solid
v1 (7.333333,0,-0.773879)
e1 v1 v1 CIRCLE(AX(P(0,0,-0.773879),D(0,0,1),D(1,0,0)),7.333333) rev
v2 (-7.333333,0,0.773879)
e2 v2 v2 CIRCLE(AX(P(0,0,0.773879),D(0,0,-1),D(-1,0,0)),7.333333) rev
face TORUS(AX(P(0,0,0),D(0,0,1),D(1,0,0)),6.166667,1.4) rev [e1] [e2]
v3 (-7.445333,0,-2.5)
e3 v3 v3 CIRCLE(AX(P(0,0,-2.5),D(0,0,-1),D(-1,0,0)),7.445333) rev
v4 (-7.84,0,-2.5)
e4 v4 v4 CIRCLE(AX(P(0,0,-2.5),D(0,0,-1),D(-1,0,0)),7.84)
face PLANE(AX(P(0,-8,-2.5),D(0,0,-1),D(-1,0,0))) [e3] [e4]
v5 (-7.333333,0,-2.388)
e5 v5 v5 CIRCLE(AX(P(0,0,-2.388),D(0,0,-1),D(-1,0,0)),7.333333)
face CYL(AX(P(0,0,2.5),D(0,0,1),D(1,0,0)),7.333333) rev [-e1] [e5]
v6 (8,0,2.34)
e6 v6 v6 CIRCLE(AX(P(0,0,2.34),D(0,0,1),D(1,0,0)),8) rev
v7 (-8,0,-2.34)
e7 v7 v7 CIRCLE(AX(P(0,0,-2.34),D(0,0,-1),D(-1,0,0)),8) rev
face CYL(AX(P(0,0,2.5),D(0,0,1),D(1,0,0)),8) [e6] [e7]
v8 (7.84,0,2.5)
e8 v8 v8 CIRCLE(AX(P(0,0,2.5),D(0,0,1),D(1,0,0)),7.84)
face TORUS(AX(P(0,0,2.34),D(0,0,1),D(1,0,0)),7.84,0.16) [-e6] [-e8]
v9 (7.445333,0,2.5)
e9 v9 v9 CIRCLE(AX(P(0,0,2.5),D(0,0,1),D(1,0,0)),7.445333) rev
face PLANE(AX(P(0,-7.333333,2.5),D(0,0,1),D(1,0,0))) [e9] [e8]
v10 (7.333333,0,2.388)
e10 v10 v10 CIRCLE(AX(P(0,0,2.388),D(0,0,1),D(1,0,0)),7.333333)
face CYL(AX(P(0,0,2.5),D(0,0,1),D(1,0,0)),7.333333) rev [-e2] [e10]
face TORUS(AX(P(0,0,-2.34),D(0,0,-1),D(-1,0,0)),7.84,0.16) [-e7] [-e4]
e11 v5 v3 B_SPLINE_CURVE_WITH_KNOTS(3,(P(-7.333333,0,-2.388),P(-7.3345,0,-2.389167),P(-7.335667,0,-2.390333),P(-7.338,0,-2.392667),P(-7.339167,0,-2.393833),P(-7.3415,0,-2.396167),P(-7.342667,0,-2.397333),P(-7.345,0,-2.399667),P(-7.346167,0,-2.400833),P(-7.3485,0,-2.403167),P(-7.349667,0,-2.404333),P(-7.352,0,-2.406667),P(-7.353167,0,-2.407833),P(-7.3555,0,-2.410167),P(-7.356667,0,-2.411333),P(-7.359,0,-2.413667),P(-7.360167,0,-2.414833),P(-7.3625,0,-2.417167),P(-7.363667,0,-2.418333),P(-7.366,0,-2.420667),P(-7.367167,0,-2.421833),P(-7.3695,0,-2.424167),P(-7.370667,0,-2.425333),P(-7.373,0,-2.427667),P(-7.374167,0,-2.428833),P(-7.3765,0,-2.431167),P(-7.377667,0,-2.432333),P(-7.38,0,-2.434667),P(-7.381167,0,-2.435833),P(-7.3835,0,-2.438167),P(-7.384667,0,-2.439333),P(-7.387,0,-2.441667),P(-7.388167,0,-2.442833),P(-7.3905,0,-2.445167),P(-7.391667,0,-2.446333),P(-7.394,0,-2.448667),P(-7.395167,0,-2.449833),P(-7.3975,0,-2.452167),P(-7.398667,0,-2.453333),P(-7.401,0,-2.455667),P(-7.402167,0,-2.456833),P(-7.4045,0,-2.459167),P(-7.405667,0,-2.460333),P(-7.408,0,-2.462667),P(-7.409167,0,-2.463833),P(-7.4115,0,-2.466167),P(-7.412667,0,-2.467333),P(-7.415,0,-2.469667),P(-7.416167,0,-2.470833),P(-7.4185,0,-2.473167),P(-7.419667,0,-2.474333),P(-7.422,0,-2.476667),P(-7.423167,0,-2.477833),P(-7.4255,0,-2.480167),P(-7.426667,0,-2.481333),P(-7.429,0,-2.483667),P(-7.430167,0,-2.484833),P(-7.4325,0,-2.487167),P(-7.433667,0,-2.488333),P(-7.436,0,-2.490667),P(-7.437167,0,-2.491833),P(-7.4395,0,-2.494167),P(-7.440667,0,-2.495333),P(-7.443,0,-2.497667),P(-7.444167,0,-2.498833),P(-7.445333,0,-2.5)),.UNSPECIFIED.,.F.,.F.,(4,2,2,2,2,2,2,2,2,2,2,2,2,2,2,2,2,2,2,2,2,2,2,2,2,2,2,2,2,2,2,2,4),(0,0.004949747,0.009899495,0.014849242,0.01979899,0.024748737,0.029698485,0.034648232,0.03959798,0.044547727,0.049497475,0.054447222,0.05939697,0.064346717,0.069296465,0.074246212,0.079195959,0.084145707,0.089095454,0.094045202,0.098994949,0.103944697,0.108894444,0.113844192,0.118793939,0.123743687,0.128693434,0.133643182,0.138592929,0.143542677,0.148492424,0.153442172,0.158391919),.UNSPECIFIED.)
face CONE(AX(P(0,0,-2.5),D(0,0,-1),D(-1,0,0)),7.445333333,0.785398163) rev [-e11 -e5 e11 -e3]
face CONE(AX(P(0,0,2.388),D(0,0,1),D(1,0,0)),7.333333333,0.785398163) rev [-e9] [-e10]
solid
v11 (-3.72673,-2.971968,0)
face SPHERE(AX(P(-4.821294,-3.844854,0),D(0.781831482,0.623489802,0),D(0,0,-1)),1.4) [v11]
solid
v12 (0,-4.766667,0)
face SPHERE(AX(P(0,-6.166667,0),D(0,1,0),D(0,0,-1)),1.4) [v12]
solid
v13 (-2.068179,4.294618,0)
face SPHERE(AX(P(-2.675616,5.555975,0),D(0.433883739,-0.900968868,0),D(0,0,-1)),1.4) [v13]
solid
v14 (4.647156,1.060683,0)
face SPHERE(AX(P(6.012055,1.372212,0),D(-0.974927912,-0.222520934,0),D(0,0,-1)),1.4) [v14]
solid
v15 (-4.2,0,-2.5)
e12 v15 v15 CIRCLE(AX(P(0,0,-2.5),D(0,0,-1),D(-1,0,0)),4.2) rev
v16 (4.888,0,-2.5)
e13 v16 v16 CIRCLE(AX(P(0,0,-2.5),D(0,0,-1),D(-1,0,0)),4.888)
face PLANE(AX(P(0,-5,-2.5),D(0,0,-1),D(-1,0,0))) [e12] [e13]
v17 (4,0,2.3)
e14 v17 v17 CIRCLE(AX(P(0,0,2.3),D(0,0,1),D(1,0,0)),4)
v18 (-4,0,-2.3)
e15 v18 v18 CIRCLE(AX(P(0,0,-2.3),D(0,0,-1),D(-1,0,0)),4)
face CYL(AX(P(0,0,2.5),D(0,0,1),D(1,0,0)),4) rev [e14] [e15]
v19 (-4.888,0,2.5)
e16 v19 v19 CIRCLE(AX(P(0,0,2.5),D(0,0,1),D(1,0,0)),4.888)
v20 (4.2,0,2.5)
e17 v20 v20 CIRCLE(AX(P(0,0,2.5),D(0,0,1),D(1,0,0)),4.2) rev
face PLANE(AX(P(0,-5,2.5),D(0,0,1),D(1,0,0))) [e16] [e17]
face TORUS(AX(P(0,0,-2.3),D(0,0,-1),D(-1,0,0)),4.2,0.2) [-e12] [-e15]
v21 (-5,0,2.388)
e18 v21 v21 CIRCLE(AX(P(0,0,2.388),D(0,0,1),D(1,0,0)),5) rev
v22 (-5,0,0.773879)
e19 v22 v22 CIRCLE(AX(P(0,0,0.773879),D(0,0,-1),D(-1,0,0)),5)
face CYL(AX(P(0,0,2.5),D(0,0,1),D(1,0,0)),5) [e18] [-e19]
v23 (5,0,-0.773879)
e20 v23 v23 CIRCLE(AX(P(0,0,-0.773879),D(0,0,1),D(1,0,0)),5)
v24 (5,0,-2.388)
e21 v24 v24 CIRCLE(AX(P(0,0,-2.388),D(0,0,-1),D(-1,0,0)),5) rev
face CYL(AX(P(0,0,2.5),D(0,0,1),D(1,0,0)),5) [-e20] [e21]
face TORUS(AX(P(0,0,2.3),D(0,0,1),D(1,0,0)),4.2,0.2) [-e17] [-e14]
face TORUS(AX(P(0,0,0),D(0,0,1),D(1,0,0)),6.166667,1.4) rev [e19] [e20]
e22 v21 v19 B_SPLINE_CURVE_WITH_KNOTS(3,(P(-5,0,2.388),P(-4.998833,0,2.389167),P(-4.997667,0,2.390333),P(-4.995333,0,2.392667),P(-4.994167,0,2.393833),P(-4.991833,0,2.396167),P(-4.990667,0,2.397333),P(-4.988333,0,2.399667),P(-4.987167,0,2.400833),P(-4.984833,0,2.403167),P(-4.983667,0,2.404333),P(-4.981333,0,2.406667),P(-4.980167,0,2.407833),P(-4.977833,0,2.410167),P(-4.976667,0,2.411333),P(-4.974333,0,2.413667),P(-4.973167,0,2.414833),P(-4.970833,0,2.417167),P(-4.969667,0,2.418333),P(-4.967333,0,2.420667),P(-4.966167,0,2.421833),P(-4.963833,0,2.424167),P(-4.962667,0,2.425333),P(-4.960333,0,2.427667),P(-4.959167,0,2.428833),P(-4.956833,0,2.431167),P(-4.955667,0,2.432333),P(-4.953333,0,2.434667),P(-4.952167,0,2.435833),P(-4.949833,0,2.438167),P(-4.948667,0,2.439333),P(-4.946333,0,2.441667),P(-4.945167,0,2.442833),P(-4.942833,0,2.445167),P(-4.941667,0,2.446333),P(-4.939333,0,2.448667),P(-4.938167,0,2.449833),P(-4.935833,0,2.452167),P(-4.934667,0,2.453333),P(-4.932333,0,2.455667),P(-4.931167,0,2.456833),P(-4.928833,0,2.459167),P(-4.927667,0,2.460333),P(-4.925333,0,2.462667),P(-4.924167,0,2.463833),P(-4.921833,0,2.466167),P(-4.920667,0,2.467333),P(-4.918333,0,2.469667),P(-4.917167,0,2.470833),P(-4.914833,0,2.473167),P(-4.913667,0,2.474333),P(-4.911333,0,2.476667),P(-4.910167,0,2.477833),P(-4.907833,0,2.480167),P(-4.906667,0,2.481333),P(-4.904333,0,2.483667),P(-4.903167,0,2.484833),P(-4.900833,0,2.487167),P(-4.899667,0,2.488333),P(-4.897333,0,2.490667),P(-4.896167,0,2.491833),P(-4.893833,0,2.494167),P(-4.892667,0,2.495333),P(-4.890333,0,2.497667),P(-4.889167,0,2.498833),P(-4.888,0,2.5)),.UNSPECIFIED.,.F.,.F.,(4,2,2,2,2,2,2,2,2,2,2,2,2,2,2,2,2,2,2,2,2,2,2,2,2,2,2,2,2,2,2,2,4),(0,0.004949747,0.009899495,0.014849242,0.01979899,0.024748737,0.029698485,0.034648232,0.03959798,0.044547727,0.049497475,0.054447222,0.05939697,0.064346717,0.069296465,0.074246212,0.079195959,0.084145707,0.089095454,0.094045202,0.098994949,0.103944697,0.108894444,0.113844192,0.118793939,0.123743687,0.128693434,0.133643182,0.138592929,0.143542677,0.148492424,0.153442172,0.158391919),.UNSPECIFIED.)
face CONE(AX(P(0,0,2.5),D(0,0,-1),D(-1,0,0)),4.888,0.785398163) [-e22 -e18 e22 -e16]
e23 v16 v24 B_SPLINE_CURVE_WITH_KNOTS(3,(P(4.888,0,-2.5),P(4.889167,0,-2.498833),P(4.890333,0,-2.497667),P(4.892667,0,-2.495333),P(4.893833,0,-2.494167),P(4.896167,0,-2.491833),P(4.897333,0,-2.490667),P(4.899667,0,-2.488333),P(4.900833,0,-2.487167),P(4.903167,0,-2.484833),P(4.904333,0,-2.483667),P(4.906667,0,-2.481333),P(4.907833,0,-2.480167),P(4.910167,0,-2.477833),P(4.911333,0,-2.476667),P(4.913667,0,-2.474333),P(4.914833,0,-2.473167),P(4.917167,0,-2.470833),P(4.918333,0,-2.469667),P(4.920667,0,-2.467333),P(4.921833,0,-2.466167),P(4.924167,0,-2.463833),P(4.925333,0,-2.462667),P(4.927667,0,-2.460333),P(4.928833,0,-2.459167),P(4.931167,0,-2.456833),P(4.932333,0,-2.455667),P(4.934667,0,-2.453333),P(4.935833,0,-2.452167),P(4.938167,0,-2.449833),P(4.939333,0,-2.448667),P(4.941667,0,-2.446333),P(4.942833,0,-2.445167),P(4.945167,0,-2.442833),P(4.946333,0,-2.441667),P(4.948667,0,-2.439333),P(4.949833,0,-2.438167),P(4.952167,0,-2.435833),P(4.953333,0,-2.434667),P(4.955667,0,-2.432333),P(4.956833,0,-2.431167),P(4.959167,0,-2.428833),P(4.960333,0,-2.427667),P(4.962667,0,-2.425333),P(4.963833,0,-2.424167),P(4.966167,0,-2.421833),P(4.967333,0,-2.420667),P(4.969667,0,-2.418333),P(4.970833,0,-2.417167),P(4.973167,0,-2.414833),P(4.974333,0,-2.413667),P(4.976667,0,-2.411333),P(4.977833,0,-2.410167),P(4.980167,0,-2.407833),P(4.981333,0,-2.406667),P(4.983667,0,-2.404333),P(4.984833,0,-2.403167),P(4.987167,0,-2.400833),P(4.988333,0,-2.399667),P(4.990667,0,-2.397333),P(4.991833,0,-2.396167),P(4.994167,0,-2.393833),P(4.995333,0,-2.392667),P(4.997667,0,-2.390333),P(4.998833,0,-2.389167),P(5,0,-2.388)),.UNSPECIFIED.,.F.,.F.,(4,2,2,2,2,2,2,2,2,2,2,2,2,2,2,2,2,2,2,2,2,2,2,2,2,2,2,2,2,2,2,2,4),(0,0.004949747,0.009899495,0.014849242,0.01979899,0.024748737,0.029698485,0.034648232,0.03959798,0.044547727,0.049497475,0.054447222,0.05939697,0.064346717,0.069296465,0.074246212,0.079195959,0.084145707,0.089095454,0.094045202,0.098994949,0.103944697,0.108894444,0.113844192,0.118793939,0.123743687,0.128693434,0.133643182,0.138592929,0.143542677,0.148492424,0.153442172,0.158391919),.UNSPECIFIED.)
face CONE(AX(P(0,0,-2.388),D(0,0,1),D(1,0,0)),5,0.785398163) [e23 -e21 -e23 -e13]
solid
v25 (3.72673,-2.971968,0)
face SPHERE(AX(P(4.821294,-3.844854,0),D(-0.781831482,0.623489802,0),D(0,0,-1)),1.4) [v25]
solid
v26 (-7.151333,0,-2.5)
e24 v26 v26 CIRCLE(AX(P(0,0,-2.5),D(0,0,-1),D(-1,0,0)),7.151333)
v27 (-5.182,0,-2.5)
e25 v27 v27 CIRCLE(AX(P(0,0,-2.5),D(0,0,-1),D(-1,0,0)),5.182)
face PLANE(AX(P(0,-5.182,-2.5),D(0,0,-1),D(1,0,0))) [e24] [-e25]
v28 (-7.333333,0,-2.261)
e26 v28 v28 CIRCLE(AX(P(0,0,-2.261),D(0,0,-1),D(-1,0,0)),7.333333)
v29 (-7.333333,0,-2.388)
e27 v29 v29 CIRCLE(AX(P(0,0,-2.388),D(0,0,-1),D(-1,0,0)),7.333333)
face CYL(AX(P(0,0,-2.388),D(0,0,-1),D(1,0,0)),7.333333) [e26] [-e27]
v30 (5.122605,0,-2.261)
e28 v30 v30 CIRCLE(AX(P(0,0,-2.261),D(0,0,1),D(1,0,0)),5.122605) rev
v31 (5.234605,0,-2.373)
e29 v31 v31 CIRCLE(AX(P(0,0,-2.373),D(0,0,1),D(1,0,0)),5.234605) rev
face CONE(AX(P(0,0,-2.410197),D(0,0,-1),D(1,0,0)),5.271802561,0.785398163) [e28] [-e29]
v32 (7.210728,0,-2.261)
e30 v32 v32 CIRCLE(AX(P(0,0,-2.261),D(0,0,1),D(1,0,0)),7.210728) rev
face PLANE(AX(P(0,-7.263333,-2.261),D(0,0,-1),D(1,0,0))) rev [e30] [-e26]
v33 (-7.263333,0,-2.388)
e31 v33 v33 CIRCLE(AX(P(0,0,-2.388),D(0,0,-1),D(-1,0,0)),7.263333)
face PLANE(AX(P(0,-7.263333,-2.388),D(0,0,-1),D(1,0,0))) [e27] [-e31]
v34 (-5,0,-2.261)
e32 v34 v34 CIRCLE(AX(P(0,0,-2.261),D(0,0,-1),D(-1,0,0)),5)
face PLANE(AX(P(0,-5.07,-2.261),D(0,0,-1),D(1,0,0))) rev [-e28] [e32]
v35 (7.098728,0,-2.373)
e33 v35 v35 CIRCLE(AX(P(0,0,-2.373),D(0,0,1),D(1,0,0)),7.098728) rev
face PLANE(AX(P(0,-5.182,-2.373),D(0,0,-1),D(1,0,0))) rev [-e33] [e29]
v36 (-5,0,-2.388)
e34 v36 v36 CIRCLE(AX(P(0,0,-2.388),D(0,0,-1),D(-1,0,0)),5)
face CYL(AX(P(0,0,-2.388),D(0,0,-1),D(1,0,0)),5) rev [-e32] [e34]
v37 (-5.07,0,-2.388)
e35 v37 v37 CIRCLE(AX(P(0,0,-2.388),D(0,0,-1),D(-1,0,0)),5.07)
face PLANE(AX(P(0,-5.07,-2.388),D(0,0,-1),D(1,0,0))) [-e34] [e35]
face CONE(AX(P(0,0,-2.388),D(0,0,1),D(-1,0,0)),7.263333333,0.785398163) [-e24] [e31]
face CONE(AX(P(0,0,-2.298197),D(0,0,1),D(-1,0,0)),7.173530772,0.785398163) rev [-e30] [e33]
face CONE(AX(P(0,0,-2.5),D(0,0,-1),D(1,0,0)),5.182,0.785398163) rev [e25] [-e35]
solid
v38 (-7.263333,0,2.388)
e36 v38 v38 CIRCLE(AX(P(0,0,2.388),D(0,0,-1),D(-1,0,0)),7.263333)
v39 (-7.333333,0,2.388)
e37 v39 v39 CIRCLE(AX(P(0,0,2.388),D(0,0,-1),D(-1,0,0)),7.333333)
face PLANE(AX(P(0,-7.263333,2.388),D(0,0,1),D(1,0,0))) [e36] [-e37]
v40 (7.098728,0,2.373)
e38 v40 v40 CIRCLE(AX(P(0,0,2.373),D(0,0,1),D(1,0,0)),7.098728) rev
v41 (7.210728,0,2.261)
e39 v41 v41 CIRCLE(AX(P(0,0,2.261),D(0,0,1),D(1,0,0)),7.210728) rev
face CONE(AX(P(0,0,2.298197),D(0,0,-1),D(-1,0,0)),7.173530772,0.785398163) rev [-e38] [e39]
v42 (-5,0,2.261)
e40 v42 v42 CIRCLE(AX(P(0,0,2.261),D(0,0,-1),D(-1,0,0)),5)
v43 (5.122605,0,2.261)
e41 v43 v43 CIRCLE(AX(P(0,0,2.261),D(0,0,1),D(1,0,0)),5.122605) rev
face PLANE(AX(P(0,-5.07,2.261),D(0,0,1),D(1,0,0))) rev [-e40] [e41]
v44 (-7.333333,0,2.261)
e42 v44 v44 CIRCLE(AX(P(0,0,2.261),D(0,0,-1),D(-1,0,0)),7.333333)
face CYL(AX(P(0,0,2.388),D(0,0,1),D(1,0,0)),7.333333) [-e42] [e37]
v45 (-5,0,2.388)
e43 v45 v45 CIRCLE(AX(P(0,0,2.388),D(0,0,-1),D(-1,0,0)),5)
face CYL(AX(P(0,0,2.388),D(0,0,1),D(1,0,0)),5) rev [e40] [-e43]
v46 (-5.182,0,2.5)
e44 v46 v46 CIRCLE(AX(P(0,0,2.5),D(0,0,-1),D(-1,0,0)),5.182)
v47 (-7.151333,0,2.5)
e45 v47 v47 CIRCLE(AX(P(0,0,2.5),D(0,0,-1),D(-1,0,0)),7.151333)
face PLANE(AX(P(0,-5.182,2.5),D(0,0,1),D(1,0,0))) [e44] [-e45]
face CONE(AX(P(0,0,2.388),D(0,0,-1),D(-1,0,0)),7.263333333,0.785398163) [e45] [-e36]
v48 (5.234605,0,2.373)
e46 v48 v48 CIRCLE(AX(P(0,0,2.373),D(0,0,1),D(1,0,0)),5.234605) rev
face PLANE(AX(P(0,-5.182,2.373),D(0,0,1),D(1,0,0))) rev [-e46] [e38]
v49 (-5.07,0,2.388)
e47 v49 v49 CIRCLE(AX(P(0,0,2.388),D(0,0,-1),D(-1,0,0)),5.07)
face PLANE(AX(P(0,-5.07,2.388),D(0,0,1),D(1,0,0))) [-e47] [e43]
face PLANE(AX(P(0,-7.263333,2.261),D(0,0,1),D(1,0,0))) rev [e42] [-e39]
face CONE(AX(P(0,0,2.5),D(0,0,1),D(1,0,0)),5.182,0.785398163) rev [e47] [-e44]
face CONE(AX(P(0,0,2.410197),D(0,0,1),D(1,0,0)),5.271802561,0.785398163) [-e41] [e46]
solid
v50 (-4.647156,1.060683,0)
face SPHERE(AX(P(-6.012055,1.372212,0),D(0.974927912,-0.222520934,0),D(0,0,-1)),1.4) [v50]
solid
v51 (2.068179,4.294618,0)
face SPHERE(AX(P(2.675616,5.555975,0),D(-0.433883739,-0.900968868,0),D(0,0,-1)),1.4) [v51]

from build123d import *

# Parameters (mm, degrees)
SKETCH3_W         = 5
SKETCH3_H         = 0.666666667
SKETCH3_H_2       = 1
SKETCH4_R         = 1.4
CIRPATTERN1_COUNT = 7
FILLET1_R         = 0.16
FILLET2_R         = 0.2
CHAMFER1_SIZE     = 0.112
CHAMFER2_SIZE     = 0.112


# Read off the part's stored shape, not the designer's step: Thicken1
with BuildPart() as part:
    # Sketch3 → Revolve1 (revolve)
    with BuildSketch(Plane(origin=(0, 0, 0), x_dir=(0, 0, -1), z_dir=(1, 0, 0)), mode=Mode.PRIVATE) as revolve1_sk:
        with Locations((0, -7.666666667)):
            Rectangle(SKETCH3_W, SKETCH3_H)
        with Locations((0, -4.5)):
            Rectangle(SKETCH3_W, SKETCH3_H_2)
    revolve(revolve1_sk.sketch.rotate(Axis((0, 0, 2.5), (0, 0, -1)), 270), axis=Axis((0, 0, 2.5), (0, 0, -1)))

    # Sketch4 → Cut-Revolve1 (revolve, cut)
    with BuildSketch(Plane(origin=(0, 0, 0), x_dir=(0, 0, -1), z_dir=(1, 0, 0)), mode=Mode.PRIVATE) as cut_revolve1_sk:
        with Locations((0, -6.166666667)):
            Circle(SKETCH4_R)
    revolve(cut_revolve1_sk.sketch.rotate(Axis((0, 0, 2.5), (0, 0, -1)), 270), axis=Axis((0, 0, 2.5), (0, 0, -1)), mode=Mode.SUBTRACT)

    # Fillet1
    fillet1_edges = [part.edges().sort_by_distance(p)[0] for p in [
        (-8, 0, -2.5),
        (-8, 0, 2.5),
    ]]
    fillet(fillet1_edges, radius=FILLET1_R)

    # Fillet2
    fillet2_edges = [part.edges().sort_by_distance(p)[0] for p in [
        (-4, 0, -2.5),
        (-4, 0, 2.5),
    ]]
    fillet(fillet2_edges, radius=FILLET2_R)

    # Chamfer1
    chamfer1_edges = [part.edges().sort_by_distance(p)[0] for p in [
        (-7.333333333, 0, 2.5),
        (-7.333333333, 0, -2.5),
    ]]
    chamfer(chamfer1_edges, length=CHAMFER1_SIZE)

    # Chamfer2
    chamfer2_edges = [part.edges().sort_by_distance(p)[0] for p in [
        (-5, 0, 2.5),
        (-5, 0, -2.5),
    ]]
    chamfer(chamfer2_edges, length=CHAMFER2_SIZE)


with BuildPart() as body_2:
    # Sketch5 → Revolve2 (revolve)
    with BuildSketch(Plane(origin=(0, 0, 0), x_dir=(0, 0, -1), z_dir=(1, 0, 0))):
        with BuildLine():
            Line((0, -4.766666667), (0, -7.566666667))
            ThreePointArc((0, -7.566666667), (1.4, -6.166666667), (0, -4.766666667))
        make_face()
    revolve(axis=Axis((0, -4.766666667, 0), (0, -1, 0)))


with BuildPart() as cirpattern1_1:
    # CirPattern1: pattern copy
    add(body_2.part.rotate(Axis((0, 0, 0), (0, 0, 1)), 1 * 360 / CIRPATTERN1_COUNT))


with BuildPart() as cirpattern1_2:
    # CirPattern1: pattern copy
    add(body_2.part.rotate(Axis((0, 0, 0), (0, 0, 1)), 2 * 360 / CIRPATTERN1_COUNT))


with BuildPart() as cirpattern1_3:
    # CirPattern1: pattern copy
    add(body_2.part.rotate(Axis((0, 0, 0), (0, 0, 1)), 3 * 360 / CIRPATTERN1_COUNT))


with BuildPart() as cirpattern1_4:
    # CirPattern1: pattern copy
    add(body_2.part.rotate(Axis((0, 0, 0), (0, 0, 1)), 4 * 360 / CIRPATTERN1_COUNT))


with BuildPart() as cirpattern1_5:
    # CirPattern1: pattern copy
    add(body_2.part.rotate(Axis((0, 0, 0), (0, 0, 1)), 5 * 360 / CIRPATTERN1_COUNT))


with BuildPart() as cirpattern1_6:
    # CirPattern1: pattern copy
    add(body_2.part.rotate(Axis((0, 0, 0), (0, 0, 1)), 6 * 360 / CIRPATTERN1_COUNT))


with BuildPart() as body_9:
    # Thicken1 outline → Thicken1 (revolve)
    with BuildSketch(Plane.XZ):
        Polygon((5, 2.388), (5, 2.261), (5.122605122, 2.261), (5.234605122, 2.373), (7.098728211, 2.373), (7.210728211, 2.261), (7.333333333, 2.261), (7.333333333, 2.388), (7.263333333, 2.388), (7.151333333, 2.5), (5.182, 2.5), (5.07, 2.388), align=None)
    revolve(axis=Axis((0, 0, 0), (0, 0, 1)))


with BuildPart() as body_10:
    # Mirror1: mirrored copy
    add(body_9.part.mirror(Plane.XY))


solid = Compound([part.part, body_2.part, cirpattern1_1.part, cirpattern1_2.part, cirpattern1_3.part, cirpattern1_4.part, cirpattern1_5.part, cirpattern1_6.part, body_9.part, body_10.part])
